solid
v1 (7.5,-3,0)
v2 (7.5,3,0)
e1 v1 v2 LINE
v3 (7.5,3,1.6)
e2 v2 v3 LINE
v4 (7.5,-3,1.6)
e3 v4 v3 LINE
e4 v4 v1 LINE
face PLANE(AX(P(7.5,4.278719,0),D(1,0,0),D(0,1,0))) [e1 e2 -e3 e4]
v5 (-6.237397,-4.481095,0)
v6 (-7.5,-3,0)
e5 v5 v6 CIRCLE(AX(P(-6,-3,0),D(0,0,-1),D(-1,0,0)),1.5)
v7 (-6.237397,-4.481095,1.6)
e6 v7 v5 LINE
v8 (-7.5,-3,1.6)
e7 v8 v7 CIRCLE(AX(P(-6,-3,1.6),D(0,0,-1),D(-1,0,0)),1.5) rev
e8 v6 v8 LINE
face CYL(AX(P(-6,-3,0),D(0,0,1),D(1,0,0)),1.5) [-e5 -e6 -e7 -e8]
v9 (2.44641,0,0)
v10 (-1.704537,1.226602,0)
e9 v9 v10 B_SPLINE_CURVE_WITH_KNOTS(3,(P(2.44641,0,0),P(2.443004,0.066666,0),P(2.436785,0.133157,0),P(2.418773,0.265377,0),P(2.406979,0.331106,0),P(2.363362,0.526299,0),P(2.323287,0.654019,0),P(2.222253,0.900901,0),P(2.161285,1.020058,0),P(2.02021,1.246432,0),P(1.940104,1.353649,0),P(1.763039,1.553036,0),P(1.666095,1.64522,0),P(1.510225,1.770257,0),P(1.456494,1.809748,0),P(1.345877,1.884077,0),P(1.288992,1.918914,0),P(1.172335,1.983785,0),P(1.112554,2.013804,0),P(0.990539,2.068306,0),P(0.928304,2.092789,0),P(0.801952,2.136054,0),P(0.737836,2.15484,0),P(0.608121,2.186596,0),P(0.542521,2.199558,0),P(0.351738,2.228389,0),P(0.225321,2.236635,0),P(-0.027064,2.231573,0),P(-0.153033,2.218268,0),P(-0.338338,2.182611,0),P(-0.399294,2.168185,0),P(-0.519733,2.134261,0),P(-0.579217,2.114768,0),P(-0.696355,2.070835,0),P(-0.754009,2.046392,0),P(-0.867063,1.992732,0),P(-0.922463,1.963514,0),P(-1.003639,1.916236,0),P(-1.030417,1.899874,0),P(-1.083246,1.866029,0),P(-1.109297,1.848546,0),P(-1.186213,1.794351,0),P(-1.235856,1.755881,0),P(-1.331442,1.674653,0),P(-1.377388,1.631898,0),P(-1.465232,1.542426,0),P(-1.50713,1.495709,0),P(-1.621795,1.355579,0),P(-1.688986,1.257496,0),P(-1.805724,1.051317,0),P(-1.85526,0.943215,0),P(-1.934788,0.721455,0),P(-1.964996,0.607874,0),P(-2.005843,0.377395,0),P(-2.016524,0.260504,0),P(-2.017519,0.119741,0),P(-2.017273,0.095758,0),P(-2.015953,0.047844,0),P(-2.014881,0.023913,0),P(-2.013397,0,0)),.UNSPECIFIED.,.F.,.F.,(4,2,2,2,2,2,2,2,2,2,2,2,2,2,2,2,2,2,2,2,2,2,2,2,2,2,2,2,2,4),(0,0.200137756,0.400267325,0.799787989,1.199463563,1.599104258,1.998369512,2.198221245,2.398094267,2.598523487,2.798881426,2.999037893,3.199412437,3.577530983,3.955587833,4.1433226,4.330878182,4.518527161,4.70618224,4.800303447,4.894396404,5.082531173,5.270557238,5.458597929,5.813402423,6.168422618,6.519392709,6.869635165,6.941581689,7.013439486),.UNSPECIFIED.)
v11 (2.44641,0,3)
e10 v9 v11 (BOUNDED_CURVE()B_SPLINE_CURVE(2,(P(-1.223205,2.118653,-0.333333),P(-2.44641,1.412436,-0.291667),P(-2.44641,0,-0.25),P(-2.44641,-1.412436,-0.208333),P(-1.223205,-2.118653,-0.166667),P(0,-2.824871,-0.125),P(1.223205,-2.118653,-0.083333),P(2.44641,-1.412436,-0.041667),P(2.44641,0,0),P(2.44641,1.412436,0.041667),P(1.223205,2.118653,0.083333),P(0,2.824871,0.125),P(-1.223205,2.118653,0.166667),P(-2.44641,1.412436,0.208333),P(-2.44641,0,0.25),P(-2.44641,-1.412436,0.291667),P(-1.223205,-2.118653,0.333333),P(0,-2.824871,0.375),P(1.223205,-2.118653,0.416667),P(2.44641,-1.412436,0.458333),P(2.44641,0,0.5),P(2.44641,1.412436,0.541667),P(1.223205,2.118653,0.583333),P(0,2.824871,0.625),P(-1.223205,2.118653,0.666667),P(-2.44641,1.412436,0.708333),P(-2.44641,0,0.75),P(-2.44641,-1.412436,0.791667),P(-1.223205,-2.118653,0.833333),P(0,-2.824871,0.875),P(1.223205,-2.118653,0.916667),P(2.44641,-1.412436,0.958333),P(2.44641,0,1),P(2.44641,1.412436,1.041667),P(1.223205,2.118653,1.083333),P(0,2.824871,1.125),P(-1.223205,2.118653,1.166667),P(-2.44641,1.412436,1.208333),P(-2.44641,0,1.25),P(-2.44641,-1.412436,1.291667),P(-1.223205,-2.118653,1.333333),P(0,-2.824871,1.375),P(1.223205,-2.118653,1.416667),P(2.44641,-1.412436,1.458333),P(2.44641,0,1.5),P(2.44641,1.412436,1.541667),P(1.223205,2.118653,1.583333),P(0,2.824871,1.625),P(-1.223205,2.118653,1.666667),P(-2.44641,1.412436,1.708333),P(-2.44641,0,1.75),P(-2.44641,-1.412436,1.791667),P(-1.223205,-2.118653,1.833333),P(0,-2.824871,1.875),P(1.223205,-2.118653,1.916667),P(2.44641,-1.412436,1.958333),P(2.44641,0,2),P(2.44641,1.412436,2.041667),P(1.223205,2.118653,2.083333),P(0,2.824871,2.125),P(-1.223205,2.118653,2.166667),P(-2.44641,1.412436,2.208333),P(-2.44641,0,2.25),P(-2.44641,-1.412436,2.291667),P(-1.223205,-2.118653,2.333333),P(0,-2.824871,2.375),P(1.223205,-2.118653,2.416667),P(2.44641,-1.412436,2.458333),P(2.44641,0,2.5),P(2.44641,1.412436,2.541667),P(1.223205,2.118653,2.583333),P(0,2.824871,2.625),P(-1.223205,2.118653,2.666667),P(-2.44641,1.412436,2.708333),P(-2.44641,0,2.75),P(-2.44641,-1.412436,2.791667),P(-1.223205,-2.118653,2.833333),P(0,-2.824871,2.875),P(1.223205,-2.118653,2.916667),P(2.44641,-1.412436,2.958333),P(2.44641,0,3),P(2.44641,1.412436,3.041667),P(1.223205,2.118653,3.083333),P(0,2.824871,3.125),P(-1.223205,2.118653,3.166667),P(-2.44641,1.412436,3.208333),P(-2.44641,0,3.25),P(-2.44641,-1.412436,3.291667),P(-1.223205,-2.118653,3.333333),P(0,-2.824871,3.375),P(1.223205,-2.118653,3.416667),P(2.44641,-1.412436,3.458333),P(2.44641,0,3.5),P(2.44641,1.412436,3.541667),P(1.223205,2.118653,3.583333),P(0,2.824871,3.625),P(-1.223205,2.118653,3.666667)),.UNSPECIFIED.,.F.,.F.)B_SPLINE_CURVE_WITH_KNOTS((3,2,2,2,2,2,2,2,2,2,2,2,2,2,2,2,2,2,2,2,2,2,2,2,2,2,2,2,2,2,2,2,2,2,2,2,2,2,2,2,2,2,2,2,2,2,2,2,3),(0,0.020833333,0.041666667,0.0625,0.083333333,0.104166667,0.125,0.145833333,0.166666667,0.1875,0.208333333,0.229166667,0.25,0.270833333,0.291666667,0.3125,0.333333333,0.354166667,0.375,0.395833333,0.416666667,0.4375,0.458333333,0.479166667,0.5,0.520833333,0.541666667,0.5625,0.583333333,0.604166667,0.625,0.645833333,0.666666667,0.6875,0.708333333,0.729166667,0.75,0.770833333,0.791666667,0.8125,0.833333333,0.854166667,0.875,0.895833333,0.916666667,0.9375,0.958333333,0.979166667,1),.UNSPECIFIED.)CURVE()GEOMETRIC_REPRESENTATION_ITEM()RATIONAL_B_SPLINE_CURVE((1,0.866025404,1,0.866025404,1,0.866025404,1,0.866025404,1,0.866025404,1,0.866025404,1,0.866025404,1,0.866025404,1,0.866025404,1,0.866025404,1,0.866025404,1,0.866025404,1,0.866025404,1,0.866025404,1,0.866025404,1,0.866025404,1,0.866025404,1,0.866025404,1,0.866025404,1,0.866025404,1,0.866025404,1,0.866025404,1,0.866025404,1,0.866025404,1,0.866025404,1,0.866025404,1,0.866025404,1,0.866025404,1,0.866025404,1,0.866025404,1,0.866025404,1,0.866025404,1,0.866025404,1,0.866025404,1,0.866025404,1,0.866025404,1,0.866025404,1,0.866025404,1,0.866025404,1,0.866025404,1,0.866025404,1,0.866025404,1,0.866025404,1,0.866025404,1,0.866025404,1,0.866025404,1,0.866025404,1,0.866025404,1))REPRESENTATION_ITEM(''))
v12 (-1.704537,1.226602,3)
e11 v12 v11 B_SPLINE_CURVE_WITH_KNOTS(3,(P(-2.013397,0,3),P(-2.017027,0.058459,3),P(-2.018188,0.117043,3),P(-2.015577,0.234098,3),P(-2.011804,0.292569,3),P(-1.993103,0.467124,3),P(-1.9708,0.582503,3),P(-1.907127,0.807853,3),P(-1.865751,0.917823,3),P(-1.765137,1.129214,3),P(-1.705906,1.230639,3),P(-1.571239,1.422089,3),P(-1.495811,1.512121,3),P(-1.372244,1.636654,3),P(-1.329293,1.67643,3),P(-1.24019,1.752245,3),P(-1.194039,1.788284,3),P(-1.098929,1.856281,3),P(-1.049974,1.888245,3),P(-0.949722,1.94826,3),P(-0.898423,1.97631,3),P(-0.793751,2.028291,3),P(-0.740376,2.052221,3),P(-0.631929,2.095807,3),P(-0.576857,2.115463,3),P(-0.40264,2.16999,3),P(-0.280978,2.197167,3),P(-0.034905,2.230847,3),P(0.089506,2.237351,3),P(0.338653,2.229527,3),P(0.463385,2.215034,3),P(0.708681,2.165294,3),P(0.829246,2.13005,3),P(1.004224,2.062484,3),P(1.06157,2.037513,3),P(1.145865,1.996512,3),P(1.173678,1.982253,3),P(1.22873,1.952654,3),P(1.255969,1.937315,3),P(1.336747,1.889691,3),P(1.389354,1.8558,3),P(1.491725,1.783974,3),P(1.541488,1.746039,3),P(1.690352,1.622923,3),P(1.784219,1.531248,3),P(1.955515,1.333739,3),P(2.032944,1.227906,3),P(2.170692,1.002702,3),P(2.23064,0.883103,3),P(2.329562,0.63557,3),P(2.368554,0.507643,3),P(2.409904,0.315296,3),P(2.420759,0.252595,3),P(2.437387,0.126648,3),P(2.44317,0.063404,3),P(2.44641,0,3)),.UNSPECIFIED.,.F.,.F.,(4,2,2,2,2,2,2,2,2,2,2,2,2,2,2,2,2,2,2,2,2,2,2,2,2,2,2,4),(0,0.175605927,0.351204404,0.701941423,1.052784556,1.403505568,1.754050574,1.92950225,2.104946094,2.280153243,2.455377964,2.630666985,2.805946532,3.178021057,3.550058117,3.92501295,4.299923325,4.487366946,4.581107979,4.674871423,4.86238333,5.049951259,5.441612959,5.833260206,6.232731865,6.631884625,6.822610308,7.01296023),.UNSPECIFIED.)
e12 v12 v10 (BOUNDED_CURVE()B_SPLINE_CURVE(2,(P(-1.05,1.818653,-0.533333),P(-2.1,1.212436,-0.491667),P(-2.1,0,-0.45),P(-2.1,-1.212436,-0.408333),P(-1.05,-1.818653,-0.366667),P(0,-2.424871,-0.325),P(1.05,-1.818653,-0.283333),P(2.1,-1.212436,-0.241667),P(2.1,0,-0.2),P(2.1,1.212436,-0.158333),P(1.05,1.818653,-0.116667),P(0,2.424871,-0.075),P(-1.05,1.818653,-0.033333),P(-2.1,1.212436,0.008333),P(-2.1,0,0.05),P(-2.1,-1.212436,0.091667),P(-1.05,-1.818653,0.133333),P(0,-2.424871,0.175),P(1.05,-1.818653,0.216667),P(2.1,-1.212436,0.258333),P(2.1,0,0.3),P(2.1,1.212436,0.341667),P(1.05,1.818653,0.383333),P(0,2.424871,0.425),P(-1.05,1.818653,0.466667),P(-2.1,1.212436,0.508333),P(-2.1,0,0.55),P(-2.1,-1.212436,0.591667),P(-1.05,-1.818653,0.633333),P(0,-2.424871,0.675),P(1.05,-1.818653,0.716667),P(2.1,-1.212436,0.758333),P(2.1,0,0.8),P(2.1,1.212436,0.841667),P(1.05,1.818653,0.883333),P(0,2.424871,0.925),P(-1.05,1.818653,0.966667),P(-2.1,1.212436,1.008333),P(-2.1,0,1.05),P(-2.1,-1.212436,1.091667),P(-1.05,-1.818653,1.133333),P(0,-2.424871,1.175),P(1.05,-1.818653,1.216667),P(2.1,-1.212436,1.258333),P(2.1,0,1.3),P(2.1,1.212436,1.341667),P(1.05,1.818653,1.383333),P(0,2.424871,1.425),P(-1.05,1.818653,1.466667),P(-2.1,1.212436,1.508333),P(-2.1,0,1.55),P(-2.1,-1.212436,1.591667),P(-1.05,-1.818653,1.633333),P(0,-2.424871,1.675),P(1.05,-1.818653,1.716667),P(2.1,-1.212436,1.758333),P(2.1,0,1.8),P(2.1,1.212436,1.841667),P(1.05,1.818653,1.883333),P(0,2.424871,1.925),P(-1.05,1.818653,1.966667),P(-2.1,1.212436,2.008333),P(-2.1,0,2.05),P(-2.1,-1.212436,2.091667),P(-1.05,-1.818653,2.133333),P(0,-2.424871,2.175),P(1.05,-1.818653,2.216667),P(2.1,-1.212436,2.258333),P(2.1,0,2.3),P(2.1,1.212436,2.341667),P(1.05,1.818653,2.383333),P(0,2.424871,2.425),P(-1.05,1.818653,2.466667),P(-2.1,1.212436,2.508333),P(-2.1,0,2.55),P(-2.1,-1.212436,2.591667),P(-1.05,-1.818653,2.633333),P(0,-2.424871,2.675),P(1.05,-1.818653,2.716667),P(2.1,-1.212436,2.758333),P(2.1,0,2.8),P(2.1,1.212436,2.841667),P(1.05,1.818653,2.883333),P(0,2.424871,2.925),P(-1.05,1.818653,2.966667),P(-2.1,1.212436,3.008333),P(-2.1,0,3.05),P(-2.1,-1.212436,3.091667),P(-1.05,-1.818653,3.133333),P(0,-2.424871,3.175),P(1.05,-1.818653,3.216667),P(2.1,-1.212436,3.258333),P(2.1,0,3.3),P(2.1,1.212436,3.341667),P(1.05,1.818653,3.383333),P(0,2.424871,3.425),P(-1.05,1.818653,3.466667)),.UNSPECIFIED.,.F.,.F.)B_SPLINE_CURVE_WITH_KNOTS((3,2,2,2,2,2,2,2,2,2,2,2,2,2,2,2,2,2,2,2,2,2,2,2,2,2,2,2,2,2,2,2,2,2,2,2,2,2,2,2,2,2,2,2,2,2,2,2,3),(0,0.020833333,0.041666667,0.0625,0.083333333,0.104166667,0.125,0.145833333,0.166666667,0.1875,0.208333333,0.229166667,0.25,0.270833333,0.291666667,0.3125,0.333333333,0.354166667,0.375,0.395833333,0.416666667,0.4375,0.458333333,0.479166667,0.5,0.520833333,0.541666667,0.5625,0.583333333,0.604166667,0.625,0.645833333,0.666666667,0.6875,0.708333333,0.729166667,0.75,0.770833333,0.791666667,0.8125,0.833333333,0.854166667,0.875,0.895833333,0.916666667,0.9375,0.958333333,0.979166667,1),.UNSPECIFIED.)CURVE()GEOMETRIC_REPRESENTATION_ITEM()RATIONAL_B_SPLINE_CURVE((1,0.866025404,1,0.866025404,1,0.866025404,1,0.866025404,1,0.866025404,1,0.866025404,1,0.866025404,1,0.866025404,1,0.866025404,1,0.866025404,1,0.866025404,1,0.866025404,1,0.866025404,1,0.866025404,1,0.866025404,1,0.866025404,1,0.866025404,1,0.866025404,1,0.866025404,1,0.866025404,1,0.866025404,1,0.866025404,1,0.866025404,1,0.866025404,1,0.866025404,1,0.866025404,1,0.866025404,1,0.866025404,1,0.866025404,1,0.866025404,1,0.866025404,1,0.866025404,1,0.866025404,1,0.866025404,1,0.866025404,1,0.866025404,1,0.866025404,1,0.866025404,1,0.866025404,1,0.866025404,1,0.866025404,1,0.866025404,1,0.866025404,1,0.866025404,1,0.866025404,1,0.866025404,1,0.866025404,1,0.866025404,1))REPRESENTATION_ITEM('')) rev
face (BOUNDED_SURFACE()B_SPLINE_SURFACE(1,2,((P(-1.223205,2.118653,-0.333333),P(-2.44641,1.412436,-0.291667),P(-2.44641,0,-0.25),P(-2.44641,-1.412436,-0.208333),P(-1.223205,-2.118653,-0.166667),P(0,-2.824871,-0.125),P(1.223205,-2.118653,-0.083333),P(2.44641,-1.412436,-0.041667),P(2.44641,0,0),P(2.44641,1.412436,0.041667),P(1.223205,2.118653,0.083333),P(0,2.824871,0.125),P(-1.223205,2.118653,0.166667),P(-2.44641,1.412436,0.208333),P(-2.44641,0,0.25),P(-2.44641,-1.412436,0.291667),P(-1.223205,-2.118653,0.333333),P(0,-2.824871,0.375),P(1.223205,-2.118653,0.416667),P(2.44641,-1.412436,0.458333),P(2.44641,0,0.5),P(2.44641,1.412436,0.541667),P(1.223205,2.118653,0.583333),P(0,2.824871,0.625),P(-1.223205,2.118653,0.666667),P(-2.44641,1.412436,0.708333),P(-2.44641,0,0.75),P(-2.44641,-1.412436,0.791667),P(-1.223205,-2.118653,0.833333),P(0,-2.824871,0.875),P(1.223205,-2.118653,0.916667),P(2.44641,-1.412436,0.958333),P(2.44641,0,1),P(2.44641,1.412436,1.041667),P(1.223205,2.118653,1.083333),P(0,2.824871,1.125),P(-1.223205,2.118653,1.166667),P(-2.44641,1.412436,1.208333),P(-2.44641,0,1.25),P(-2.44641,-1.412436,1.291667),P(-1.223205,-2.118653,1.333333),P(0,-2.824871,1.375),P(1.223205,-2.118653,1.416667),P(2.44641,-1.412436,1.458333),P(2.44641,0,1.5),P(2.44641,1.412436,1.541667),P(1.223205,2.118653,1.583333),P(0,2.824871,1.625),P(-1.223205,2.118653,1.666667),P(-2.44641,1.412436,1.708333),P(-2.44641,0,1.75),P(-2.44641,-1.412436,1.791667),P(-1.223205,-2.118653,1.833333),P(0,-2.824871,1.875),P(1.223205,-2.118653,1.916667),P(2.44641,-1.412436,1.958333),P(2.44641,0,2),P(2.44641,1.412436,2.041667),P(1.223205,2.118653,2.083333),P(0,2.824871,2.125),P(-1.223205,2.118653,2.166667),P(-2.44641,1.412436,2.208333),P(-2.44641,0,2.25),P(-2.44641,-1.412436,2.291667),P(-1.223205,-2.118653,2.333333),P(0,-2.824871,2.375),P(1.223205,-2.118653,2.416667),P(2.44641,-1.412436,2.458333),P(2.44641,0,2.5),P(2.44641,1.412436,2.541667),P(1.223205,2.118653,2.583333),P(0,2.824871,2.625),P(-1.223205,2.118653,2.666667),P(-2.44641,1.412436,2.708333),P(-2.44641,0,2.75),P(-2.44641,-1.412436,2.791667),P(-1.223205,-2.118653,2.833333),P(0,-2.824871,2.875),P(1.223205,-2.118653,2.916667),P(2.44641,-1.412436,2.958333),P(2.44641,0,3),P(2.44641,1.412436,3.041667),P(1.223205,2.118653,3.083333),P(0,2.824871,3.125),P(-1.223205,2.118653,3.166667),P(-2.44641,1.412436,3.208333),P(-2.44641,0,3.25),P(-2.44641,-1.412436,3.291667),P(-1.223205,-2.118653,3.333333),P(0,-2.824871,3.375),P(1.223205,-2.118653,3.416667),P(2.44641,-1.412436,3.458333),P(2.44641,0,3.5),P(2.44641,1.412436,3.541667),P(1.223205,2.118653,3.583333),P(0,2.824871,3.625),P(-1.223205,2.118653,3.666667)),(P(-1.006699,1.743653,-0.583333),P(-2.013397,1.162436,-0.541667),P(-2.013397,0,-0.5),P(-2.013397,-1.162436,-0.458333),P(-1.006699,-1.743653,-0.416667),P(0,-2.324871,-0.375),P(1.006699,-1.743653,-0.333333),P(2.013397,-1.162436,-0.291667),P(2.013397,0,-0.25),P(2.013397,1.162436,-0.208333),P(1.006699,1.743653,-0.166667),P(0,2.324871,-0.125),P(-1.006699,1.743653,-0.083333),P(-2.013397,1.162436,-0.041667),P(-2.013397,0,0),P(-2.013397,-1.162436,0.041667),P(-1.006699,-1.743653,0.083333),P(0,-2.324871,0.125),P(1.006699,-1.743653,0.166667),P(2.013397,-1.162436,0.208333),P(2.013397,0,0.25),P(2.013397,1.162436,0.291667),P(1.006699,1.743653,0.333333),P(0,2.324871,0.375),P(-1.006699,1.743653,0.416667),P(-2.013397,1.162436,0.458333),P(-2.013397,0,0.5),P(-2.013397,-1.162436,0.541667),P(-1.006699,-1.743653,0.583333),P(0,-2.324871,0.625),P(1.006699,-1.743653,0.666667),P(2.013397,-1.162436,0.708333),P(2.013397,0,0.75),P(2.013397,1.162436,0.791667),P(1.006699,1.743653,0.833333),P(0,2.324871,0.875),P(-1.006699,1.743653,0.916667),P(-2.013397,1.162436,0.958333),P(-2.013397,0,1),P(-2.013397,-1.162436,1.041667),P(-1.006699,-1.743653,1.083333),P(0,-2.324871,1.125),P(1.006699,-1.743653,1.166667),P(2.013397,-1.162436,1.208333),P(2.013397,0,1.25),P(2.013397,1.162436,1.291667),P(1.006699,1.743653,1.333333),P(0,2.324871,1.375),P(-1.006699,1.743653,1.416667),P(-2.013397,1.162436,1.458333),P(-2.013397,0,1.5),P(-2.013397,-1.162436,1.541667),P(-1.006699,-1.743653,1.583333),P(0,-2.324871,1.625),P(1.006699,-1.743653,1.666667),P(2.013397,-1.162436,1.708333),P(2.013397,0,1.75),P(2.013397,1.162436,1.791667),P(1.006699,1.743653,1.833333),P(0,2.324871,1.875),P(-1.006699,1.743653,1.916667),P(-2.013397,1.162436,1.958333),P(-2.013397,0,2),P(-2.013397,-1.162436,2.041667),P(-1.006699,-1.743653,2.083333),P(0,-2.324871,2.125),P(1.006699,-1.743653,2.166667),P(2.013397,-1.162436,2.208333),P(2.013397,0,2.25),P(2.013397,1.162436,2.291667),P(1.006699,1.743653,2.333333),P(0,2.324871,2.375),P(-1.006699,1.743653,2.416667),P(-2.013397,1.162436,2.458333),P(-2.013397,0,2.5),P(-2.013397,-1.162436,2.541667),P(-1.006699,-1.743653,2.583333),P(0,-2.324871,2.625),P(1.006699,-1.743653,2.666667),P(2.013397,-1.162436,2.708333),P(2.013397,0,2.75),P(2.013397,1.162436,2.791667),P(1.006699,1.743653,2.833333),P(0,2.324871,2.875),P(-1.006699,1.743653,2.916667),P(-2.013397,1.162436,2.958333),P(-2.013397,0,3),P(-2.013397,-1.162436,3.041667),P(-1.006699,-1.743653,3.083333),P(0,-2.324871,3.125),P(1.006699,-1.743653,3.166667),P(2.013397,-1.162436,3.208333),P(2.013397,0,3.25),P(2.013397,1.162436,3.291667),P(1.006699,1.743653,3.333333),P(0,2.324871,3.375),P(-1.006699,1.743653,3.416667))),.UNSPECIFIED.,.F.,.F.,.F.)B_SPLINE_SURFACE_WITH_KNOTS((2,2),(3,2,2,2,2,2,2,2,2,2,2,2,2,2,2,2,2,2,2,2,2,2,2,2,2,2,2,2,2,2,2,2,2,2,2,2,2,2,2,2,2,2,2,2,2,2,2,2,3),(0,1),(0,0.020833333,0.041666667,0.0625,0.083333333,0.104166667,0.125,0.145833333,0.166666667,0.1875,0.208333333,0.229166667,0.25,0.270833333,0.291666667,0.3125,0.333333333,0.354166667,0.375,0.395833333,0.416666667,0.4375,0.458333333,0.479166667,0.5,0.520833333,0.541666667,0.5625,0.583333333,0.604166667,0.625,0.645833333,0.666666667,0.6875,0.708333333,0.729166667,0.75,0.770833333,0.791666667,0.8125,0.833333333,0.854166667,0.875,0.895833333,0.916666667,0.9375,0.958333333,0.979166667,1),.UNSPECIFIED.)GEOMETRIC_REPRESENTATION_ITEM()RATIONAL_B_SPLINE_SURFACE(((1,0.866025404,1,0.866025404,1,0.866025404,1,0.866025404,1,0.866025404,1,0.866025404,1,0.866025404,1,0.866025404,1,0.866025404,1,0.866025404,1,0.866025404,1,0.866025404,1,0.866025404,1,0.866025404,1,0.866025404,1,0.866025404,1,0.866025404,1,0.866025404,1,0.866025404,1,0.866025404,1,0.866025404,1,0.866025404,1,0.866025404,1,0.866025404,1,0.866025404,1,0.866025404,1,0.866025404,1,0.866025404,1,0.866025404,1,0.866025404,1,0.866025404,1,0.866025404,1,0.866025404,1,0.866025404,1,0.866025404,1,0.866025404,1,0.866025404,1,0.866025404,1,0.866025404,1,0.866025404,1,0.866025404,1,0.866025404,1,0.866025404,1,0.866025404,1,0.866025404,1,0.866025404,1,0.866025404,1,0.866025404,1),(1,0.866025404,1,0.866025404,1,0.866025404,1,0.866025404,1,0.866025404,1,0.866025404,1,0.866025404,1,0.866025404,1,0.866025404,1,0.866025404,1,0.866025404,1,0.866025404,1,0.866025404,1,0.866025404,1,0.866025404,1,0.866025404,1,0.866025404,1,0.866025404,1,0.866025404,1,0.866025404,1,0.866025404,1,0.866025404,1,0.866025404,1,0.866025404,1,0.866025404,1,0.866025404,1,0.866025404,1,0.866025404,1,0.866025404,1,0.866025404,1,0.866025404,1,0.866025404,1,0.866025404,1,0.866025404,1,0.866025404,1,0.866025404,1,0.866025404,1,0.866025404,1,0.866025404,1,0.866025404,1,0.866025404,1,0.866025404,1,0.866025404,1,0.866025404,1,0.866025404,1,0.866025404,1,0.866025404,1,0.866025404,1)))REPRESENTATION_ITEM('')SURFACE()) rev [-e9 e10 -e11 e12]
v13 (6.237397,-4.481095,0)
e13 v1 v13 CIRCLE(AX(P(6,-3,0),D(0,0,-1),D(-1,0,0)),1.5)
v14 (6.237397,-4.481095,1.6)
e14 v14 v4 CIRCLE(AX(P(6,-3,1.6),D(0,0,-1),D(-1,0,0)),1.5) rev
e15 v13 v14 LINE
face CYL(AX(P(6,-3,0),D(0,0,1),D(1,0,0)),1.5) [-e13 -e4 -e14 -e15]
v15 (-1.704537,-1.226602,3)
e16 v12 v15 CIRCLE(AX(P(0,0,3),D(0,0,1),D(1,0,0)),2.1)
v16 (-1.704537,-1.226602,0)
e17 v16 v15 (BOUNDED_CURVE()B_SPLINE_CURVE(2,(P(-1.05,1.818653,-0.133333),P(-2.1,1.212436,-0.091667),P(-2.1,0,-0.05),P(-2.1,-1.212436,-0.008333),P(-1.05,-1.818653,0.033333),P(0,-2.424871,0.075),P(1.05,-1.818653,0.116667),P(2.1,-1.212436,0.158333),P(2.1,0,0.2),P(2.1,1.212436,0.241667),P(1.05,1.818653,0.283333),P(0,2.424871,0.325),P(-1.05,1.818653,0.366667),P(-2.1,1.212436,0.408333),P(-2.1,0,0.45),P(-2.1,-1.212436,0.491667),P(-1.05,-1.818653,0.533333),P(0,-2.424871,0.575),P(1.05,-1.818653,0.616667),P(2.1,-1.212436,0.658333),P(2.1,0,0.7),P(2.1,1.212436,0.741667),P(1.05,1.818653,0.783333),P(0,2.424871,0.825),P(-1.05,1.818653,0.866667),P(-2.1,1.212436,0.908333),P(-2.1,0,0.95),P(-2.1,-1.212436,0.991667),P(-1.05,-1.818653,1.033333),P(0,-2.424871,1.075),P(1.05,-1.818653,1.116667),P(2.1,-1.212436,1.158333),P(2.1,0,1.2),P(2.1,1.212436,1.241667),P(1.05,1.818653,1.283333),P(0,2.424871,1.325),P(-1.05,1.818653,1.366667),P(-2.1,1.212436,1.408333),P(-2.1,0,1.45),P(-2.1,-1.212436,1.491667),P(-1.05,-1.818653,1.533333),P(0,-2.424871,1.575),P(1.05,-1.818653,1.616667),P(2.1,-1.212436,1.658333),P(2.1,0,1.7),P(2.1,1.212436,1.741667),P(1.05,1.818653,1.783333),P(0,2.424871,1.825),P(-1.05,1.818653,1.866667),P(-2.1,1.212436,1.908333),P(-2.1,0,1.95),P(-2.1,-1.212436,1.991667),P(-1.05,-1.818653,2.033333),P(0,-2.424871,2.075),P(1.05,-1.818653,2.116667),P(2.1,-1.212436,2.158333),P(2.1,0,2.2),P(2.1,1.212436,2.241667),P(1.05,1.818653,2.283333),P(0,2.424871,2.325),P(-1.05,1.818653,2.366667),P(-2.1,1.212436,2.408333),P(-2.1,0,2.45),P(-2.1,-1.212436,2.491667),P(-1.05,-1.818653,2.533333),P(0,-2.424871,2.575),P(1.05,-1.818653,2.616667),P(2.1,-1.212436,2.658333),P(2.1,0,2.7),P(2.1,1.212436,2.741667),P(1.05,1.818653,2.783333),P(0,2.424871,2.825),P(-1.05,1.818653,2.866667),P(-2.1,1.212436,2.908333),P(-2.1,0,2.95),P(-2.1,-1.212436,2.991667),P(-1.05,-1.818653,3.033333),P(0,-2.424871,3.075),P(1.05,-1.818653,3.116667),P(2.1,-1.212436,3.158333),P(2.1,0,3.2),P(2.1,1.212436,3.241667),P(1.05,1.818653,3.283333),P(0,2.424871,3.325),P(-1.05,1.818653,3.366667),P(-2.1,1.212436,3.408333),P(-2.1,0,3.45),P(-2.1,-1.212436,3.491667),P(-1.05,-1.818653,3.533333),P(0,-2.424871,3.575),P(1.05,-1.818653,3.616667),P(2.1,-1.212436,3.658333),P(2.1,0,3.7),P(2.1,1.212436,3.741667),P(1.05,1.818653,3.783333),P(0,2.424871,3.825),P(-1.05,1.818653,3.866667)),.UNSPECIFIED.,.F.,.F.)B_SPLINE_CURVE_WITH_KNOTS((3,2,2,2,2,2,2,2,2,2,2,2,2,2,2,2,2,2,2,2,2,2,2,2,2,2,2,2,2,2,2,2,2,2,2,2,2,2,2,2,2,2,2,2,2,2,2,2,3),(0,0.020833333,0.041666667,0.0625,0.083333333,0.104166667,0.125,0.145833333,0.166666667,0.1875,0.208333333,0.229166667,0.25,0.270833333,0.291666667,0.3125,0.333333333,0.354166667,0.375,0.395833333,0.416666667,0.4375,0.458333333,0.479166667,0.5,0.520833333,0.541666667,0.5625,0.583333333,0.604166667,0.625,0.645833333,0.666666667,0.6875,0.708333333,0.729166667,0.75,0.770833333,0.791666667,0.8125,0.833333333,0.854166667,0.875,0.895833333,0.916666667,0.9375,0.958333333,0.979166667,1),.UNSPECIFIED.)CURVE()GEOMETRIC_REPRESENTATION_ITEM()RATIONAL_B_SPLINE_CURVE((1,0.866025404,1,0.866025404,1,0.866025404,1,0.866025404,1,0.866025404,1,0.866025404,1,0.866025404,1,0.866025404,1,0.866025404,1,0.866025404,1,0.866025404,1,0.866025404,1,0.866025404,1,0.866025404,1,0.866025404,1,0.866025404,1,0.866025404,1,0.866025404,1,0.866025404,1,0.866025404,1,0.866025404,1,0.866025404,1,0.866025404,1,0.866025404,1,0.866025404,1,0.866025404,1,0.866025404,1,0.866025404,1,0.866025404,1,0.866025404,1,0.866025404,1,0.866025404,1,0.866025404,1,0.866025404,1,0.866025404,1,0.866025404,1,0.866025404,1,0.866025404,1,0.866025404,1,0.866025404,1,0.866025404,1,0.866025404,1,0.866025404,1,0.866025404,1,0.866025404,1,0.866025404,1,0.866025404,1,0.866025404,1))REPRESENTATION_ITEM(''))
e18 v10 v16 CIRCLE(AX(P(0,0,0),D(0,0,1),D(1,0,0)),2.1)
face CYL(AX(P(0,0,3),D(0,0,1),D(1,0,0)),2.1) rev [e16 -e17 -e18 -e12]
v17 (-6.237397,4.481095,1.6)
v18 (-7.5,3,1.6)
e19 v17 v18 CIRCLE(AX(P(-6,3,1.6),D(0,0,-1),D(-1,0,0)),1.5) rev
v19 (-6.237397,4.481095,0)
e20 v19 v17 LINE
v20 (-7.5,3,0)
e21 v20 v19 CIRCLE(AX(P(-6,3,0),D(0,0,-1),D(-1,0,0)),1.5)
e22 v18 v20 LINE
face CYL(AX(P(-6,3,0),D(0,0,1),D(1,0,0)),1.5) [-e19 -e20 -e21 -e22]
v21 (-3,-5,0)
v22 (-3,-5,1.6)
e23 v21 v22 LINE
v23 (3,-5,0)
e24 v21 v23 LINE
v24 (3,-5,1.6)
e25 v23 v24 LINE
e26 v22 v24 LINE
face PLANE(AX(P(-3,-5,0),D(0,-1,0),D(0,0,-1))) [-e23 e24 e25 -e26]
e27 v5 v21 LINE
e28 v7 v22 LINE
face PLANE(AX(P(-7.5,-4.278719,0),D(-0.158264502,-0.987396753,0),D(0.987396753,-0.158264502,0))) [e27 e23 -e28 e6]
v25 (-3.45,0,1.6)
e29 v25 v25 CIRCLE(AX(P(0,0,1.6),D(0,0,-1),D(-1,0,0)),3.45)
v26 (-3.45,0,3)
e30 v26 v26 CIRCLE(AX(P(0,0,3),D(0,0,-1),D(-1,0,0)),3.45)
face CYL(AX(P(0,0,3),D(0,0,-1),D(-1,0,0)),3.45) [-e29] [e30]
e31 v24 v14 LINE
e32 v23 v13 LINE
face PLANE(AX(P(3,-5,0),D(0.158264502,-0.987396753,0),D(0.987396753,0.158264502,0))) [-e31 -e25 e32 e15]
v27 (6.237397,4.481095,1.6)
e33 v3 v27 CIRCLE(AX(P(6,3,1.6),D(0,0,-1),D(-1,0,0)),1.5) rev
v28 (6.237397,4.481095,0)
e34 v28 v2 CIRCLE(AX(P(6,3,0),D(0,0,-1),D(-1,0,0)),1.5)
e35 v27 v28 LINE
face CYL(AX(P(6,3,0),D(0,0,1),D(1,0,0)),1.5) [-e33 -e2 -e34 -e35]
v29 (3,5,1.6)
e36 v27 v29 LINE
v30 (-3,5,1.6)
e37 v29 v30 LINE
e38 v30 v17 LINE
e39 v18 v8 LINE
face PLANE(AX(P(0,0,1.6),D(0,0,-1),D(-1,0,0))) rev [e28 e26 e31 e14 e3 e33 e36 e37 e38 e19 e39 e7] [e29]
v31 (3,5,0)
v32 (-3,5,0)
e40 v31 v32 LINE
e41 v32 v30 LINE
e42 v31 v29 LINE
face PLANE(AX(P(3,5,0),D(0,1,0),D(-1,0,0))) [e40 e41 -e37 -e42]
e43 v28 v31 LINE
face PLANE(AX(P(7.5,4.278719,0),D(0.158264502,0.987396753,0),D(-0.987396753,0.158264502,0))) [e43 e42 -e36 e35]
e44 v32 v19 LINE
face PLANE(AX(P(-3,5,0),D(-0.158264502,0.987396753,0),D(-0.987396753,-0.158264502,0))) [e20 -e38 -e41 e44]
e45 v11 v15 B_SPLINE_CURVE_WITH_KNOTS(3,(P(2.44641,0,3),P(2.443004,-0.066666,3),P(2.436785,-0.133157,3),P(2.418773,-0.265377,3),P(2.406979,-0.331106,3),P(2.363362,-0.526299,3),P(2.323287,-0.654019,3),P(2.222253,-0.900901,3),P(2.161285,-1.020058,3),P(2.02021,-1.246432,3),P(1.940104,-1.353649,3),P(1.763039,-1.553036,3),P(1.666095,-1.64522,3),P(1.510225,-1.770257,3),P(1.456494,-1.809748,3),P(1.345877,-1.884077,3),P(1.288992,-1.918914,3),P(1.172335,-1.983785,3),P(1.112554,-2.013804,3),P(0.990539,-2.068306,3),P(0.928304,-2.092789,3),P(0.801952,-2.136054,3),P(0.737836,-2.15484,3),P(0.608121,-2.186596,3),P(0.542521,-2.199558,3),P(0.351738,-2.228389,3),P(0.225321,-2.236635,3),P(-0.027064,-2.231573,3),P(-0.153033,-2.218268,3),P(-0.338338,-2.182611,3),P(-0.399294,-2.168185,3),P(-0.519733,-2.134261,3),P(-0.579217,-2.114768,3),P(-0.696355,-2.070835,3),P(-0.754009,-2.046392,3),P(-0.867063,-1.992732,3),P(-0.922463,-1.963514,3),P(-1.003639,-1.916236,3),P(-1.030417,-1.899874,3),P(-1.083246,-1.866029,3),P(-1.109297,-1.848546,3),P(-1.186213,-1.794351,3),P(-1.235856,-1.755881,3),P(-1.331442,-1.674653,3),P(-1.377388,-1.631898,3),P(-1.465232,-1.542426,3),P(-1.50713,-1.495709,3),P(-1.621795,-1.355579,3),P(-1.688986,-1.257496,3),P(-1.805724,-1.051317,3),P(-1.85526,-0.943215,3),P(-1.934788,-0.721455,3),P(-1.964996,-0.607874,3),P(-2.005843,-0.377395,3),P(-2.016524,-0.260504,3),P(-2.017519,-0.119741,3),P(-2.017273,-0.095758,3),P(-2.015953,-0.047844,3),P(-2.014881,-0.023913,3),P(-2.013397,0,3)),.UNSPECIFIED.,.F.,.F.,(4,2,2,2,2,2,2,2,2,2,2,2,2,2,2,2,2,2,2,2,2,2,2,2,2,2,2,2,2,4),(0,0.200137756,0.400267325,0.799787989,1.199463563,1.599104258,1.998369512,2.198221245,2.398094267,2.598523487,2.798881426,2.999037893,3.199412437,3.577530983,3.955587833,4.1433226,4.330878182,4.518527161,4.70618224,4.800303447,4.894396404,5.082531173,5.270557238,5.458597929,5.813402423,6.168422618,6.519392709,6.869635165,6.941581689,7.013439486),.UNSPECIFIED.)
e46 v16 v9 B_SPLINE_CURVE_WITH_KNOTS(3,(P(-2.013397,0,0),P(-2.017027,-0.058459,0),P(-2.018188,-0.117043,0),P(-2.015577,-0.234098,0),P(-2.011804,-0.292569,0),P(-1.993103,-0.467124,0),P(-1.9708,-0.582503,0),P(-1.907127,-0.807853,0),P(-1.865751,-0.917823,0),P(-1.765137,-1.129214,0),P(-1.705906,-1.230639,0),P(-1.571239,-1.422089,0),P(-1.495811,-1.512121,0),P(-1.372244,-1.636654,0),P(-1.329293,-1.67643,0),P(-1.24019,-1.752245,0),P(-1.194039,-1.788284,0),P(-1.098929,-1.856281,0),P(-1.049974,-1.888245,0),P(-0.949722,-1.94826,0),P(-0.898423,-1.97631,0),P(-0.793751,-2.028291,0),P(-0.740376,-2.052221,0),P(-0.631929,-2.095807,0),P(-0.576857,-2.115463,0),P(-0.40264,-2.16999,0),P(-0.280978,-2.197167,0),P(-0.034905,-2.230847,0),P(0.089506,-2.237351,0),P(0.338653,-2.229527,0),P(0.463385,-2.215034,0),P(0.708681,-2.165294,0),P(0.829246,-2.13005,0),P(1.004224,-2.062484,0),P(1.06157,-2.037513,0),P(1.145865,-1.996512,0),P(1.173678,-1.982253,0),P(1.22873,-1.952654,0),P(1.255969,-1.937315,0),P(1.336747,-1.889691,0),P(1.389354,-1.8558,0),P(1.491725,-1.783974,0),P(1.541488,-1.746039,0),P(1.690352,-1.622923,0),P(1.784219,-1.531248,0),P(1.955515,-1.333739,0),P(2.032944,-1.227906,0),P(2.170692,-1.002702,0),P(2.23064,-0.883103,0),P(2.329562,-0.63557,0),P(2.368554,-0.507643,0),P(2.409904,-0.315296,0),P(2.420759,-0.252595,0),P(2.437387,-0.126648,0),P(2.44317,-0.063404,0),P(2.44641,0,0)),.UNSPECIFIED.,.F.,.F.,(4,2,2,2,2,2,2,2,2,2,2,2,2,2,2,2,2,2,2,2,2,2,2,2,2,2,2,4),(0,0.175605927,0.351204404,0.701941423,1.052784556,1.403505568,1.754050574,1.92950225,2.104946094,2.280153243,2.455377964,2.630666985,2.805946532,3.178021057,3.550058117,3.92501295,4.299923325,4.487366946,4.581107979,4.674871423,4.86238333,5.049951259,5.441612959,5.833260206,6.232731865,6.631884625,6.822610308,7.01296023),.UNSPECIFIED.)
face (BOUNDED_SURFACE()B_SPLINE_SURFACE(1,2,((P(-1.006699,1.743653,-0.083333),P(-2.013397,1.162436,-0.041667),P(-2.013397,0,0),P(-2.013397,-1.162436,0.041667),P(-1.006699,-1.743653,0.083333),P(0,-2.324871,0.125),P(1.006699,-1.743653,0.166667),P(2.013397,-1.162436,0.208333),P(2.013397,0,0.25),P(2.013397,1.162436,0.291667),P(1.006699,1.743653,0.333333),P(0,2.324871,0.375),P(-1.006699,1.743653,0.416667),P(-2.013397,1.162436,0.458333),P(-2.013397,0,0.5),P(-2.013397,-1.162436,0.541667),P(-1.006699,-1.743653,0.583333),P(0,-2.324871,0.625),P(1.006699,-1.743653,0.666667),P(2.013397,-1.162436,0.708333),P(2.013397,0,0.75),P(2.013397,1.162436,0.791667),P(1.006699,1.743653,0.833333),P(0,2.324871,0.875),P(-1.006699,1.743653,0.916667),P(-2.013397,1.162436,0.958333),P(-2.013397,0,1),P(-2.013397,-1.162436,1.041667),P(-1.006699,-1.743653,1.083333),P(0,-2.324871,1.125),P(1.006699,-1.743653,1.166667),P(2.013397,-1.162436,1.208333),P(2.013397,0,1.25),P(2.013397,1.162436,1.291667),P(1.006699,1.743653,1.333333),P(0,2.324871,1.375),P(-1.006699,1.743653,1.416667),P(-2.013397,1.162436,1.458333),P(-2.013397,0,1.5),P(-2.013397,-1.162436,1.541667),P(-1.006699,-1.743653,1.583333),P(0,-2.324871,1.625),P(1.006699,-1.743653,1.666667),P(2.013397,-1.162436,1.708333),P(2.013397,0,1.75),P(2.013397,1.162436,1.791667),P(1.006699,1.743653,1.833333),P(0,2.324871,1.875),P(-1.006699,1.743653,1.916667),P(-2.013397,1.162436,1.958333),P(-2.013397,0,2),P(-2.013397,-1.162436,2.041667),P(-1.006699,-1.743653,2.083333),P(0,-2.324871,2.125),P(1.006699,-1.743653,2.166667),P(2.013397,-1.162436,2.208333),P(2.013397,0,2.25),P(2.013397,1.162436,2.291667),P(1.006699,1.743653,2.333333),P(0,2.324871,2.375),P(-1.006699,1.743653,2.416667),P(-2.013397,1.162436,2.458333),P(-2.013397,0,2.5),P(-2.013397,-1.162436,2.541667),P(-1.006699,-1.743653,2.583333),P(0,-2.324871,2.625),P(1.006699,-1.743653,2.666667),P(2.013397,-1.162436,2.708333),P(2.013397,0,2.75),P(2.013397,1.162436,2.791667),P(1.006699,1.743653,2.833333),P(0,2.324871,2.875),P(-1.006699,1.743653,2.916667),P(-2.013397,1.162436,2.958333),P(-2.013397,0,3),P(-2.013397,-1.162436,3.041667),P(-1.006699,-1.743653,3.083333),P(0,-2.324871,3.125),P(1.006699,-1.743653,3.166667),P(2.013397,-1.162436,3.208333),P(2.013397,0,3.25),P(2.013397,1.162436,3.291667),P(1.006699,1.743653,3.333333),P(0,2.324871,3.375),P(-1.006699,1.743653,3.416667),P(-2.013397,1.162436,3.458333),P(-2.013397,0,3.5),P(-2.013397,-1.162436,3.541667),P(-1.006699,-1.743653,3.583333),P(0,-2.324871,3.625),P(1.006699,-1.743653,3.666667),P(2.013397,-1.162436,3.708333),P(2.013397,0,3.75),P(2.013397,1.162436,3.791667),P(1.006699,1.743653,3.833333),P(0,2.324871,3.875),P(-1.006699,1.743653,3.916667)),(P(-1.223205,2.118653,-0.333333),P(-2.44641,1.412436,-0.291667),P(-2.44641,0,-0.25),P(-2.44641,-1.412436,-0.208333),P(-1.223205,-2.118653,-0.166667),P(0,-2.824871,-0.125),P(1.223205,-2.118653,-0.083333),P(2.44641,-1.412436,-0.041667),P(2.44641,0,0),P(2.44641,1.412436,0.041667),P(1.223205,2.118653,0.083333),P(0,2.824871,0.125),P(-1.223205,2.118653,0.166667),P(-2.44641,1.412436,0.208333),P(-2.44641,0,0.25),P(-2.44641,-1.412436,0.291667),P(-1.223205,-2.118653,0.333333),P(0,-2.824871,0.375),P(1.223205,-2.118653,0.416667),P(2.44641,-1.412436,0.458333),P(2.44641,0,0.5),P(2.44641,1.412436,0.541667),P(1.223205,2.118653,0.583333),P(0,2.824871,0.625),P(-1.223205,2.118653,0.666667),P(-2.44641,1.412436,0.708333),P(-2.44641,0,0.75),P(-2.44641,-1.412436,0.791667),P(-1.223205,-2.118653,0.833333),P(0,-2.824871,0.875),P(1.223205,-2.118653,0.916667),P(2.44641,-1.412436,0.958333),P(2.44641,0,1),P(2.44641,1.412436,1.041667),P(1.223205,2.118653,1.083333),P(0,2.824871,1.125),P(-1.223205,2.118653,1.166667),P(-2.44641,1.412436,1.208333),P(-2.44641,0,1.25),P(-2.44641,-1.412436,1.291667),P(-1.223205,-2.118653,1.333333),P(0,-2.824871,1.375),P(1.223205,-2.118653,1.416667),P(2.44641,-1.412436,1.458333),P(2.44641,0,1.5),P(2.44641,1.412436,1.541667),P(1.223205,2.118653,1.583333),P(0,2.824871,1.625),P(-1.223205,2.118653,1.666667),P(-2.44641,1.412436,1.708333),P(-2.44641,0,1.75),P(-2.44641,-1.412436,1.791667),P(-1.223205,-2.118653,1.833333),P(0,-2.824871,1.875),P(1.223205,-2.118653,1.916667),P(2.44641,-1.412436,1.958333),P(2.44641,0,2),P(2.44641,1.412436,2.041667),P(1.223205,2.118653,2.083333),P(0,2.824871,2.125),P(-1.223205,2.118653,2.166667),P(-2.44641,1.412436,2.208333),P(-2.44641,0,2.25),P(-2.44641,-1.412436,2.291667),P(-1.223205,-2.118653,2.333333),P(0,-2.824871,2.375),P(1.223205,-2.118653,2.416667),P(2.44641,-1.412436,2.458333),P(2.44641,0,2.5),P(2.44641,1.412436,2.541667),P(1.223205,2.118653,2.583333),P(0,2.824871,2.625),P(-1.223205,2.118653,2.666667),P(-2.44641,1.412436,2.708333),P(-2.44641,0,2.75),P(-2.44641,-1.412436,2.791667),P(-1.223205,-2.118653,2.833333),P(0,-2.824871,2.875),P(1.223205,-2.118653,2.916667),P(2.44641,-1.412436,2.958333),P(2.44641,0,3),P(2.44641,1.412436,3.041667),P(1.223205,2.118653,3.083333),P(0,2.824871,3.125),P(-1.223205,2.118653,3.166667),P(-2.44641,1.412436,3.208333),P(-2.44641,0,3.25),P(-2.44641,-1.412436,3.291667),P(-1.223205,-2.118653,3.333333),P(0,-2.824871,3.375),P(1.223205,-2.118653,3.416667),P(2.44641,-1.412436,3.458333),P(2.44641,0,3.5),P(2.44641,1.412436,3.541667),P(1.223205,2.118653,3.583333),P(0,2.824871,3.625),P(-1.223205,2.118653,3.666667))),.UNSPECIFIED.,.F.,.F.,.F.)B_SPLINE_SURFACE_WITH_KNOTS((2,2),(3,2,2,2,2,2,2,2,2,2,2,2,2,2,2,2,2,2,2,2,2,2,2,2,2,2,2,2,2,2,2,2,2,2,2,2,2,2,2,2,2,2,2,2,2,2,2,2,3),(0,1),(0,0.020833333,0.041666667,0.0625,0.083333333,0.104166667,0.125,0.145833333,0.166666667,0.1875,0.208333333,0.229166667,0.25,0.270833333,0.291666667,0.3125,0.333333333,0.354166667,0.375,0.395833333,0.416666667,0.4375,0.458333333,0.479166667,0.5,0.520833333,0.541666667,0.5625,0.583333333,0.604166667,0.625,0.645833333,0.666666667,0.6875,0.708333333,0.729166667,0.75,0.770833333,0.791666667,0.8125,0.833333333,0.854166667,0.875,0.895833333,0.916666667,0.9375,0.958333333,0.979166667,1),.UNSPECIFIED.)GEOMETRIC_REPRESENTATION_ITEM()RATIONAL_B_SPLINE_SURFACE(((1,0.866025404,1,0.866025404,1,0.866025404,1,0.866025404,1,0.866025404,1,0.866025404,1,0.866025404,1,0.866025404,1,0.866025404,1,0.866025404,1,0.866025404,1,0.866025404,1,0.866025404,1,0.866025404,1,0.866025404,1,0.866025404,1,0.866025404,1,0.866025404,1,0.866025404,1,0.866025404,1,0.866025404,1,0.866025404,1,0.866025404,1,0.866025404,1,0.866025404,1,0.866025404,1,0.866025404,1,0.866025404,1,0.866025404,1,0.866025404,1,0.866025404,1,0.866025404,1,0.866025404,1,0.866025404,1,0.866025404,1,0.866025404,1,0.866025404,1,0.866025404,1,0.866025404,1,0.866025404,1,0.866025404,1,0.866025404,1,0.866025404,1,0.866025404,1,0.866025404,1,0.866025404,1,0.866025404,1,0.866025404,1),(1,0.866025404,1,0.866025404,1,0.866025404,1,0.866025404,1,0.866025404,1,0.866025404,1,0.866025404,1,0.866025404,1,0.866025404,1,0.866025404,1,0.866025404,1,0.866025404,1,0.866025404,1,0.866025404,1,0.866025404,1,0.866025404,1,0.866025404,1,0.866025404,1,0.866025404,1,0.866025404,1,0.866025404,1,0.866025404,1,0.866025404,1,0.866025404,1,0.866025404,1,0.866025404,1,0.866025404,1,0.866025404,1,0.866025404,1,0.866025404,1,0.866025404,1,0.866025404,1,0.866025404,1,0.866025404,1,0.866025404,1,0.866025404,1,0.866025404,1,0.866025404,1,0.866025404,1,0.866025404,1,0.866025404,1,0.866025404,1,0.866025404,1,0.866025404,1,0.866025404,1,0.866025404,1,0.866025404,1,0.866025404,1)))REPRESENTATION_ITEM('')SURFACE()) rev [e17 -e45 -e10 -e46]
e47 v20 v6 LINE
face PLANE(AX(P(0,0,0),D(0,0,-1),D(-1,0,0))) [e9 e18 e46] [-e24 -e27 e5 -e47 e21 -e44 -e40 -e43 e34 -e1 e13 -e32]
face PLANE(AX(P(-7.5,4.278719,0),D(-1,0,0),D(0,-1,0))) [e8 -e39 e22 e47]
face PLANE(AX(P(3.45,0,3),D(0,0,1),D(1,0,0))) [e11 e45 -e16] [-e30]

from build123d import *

# Parameters (mm, degrees)
BOSS_EXTRUDE1_DEPTH        = 1.6
DRAFT1_ANGLE               = 9.10617604
SKETCH2_W                  = 3.45
SKETCH2_H                  = 1.4
F_4_2_4_2_DIAMETER_HOLE1_D = 4.2
FILLET1_R                  = 1.5
CUT_SWEEP1_PITCH           = 0.5


with BuildPart() as part:
    # Sketch1 → Boss-Extrude1 (new body)
    with BuildSketch(Plane.XY.offset(1.6)):
        Polygon((3, -5), (6.092206474, -4.504366896), (7.5, 4.278719262), (3, 5), (-3, 5), (-7.5, 4.278719262), (-7.5, -4.278719262), (-3, -5), align=None)
    extrude(amount=-BOSS_EXTRUDE1_DEPTH)

    # Draft1
    draft1_faces = [part.faces().sort_by_distance(p)[0] for p in [
        (6.796103237, -0.112823817, 0.8),
    ]]
    draft(draft1_faces, Plane(origin=(7.5, 4.278719262, 0), x_dir=(0.9873967528040769, -0.15826450186938548, 0), z_dir=(0.15826450186938548, 0.9873967528040769, 0)), DRAFT1_ANGLE)

    # Sketch2 → Revolve1 (revolve)
    with BuildSketch(Plane.XZ, mode=Mode.PRIVATE) as revolve1_sk:
        with Locations((1.725, 2.3)):
            Rectangle(SKETCH2_W, SKETCH2_H)
    revolve(revolve1_sk.sketch.rotate(Axis((0, 0, 3), (0, 0, -1)), 180), axis=Axis((0, 0, 3), (0, 0, -1)))

    # Ø4.2 (4.2) Diameter Hole1 (through all)
    with Locations(Plane.XY.offset(3)):
        with Locations((0, 0)):
            Hole(F_4_2_4_2_DIAMETER_HOLE1_D / 2)

    # Fillet1
    fillet1_edges = [part.edges().sort_by_distance(p)[0] for p in [
        (-7.5, -4.278719262, 0.8),
        (-7.5, 4.278719262, 0.8),
        (7.5, 4.278719262, 0.8),
        (7.5, -4.278719262, 0.8),
    ]]
    fillet(fillet1_edges, radius=FILLET1_R)

    # Cut-Sweep1: arcs per turn and ends read off the stored shape
    # Cut-Sweep1: the profile of Sketch6 screwed along a right-hand helix through 8 turns, 6 arcs to a turn; built about Z, then put on its axis
    cut_sweep1_z = Axis((0, 0, 0), (0, 0, 1))
    cut_sweep1_corners = [(-1.223205081, -2.118653348, -0.666666667), (-0.96339746, -1.668653348, -0.366666667), (-0.96339746, -1.668653348, -0.966666667)]
    with BuildLine(mode=Mode.PRIVATE) as cut_sweep1_profile:
        Line(cut_sweep1_corners[0], cut_sweep1_corners[1])
        Line(cut_sweep1_corners[1], cut_sweep1_corners[2])
        Line(cut_sweep1_corners[2], cut_sweep1_corners[0])
    cut_sweep1_cap = Face(cut_sweep1_profile.wire())
    cut_sweep1_turn_angles = [0, 30, 60, 90, 120, 150, 180, 210, 240, 270, 300, 330, 360]
    cut_sweep1_turn_weights = [1, 0.8660254037844387, 1, 0.8660254037844387, 1, 0.8660254037844387, 1, 0.8660254037844387, 1, 0.8660254037844387, 1, 0.8660254037844387, 1]
    cut_sweep1_turn_rails = [Edge.make_bspline([Vector(p[0], p[1], 0).rotate(cut_sweep1_z, cut_sweep1_turn_angles[k]) / cut_sweep1_turn_weights[k] + Vector(0, 0, p[2] + CUT_SWEEP1_PITCH * cut_sweep1_turn_angles[k] / 360) for k in range(13)], [0, 0, 0, 1, 1, 2, 2, 3, 3, 4, 4, 5, 5, 6, 6, 6], 2, cut_sweep1_turn_weights) for p in cut_sweep1_corners]
    cut_sweep1_turn_sides = [Face.make_surface_from_curves(cut_sweep1_turn_rails[p[0]], cut_sweep1_turn_rails[p[1]]) for p in [(0, 1), (1, 2), (2, 0)]]
    cut_sweep1 = Plane(origin=(0, 0, 3), x_dir=(1, 0, 0), z_dir=(0, 0, -1)) * Solid(Shell([*[p.moved(Location((0, 0, CUT_SWEEP1_PITCH * i))) for i in range(8) for p in cut_sweep1_turn_sides], cut_sweep1_cap, cut_sweep1_cap.rotate(cut_sweep1_z, 2880).moved(Location((0, 0, CUT_SWEEP1_PITCH * 2880 / 360)))]))
    add(cut_sweep1, mode=Mode.SUBTRACT)


solid = part.part
